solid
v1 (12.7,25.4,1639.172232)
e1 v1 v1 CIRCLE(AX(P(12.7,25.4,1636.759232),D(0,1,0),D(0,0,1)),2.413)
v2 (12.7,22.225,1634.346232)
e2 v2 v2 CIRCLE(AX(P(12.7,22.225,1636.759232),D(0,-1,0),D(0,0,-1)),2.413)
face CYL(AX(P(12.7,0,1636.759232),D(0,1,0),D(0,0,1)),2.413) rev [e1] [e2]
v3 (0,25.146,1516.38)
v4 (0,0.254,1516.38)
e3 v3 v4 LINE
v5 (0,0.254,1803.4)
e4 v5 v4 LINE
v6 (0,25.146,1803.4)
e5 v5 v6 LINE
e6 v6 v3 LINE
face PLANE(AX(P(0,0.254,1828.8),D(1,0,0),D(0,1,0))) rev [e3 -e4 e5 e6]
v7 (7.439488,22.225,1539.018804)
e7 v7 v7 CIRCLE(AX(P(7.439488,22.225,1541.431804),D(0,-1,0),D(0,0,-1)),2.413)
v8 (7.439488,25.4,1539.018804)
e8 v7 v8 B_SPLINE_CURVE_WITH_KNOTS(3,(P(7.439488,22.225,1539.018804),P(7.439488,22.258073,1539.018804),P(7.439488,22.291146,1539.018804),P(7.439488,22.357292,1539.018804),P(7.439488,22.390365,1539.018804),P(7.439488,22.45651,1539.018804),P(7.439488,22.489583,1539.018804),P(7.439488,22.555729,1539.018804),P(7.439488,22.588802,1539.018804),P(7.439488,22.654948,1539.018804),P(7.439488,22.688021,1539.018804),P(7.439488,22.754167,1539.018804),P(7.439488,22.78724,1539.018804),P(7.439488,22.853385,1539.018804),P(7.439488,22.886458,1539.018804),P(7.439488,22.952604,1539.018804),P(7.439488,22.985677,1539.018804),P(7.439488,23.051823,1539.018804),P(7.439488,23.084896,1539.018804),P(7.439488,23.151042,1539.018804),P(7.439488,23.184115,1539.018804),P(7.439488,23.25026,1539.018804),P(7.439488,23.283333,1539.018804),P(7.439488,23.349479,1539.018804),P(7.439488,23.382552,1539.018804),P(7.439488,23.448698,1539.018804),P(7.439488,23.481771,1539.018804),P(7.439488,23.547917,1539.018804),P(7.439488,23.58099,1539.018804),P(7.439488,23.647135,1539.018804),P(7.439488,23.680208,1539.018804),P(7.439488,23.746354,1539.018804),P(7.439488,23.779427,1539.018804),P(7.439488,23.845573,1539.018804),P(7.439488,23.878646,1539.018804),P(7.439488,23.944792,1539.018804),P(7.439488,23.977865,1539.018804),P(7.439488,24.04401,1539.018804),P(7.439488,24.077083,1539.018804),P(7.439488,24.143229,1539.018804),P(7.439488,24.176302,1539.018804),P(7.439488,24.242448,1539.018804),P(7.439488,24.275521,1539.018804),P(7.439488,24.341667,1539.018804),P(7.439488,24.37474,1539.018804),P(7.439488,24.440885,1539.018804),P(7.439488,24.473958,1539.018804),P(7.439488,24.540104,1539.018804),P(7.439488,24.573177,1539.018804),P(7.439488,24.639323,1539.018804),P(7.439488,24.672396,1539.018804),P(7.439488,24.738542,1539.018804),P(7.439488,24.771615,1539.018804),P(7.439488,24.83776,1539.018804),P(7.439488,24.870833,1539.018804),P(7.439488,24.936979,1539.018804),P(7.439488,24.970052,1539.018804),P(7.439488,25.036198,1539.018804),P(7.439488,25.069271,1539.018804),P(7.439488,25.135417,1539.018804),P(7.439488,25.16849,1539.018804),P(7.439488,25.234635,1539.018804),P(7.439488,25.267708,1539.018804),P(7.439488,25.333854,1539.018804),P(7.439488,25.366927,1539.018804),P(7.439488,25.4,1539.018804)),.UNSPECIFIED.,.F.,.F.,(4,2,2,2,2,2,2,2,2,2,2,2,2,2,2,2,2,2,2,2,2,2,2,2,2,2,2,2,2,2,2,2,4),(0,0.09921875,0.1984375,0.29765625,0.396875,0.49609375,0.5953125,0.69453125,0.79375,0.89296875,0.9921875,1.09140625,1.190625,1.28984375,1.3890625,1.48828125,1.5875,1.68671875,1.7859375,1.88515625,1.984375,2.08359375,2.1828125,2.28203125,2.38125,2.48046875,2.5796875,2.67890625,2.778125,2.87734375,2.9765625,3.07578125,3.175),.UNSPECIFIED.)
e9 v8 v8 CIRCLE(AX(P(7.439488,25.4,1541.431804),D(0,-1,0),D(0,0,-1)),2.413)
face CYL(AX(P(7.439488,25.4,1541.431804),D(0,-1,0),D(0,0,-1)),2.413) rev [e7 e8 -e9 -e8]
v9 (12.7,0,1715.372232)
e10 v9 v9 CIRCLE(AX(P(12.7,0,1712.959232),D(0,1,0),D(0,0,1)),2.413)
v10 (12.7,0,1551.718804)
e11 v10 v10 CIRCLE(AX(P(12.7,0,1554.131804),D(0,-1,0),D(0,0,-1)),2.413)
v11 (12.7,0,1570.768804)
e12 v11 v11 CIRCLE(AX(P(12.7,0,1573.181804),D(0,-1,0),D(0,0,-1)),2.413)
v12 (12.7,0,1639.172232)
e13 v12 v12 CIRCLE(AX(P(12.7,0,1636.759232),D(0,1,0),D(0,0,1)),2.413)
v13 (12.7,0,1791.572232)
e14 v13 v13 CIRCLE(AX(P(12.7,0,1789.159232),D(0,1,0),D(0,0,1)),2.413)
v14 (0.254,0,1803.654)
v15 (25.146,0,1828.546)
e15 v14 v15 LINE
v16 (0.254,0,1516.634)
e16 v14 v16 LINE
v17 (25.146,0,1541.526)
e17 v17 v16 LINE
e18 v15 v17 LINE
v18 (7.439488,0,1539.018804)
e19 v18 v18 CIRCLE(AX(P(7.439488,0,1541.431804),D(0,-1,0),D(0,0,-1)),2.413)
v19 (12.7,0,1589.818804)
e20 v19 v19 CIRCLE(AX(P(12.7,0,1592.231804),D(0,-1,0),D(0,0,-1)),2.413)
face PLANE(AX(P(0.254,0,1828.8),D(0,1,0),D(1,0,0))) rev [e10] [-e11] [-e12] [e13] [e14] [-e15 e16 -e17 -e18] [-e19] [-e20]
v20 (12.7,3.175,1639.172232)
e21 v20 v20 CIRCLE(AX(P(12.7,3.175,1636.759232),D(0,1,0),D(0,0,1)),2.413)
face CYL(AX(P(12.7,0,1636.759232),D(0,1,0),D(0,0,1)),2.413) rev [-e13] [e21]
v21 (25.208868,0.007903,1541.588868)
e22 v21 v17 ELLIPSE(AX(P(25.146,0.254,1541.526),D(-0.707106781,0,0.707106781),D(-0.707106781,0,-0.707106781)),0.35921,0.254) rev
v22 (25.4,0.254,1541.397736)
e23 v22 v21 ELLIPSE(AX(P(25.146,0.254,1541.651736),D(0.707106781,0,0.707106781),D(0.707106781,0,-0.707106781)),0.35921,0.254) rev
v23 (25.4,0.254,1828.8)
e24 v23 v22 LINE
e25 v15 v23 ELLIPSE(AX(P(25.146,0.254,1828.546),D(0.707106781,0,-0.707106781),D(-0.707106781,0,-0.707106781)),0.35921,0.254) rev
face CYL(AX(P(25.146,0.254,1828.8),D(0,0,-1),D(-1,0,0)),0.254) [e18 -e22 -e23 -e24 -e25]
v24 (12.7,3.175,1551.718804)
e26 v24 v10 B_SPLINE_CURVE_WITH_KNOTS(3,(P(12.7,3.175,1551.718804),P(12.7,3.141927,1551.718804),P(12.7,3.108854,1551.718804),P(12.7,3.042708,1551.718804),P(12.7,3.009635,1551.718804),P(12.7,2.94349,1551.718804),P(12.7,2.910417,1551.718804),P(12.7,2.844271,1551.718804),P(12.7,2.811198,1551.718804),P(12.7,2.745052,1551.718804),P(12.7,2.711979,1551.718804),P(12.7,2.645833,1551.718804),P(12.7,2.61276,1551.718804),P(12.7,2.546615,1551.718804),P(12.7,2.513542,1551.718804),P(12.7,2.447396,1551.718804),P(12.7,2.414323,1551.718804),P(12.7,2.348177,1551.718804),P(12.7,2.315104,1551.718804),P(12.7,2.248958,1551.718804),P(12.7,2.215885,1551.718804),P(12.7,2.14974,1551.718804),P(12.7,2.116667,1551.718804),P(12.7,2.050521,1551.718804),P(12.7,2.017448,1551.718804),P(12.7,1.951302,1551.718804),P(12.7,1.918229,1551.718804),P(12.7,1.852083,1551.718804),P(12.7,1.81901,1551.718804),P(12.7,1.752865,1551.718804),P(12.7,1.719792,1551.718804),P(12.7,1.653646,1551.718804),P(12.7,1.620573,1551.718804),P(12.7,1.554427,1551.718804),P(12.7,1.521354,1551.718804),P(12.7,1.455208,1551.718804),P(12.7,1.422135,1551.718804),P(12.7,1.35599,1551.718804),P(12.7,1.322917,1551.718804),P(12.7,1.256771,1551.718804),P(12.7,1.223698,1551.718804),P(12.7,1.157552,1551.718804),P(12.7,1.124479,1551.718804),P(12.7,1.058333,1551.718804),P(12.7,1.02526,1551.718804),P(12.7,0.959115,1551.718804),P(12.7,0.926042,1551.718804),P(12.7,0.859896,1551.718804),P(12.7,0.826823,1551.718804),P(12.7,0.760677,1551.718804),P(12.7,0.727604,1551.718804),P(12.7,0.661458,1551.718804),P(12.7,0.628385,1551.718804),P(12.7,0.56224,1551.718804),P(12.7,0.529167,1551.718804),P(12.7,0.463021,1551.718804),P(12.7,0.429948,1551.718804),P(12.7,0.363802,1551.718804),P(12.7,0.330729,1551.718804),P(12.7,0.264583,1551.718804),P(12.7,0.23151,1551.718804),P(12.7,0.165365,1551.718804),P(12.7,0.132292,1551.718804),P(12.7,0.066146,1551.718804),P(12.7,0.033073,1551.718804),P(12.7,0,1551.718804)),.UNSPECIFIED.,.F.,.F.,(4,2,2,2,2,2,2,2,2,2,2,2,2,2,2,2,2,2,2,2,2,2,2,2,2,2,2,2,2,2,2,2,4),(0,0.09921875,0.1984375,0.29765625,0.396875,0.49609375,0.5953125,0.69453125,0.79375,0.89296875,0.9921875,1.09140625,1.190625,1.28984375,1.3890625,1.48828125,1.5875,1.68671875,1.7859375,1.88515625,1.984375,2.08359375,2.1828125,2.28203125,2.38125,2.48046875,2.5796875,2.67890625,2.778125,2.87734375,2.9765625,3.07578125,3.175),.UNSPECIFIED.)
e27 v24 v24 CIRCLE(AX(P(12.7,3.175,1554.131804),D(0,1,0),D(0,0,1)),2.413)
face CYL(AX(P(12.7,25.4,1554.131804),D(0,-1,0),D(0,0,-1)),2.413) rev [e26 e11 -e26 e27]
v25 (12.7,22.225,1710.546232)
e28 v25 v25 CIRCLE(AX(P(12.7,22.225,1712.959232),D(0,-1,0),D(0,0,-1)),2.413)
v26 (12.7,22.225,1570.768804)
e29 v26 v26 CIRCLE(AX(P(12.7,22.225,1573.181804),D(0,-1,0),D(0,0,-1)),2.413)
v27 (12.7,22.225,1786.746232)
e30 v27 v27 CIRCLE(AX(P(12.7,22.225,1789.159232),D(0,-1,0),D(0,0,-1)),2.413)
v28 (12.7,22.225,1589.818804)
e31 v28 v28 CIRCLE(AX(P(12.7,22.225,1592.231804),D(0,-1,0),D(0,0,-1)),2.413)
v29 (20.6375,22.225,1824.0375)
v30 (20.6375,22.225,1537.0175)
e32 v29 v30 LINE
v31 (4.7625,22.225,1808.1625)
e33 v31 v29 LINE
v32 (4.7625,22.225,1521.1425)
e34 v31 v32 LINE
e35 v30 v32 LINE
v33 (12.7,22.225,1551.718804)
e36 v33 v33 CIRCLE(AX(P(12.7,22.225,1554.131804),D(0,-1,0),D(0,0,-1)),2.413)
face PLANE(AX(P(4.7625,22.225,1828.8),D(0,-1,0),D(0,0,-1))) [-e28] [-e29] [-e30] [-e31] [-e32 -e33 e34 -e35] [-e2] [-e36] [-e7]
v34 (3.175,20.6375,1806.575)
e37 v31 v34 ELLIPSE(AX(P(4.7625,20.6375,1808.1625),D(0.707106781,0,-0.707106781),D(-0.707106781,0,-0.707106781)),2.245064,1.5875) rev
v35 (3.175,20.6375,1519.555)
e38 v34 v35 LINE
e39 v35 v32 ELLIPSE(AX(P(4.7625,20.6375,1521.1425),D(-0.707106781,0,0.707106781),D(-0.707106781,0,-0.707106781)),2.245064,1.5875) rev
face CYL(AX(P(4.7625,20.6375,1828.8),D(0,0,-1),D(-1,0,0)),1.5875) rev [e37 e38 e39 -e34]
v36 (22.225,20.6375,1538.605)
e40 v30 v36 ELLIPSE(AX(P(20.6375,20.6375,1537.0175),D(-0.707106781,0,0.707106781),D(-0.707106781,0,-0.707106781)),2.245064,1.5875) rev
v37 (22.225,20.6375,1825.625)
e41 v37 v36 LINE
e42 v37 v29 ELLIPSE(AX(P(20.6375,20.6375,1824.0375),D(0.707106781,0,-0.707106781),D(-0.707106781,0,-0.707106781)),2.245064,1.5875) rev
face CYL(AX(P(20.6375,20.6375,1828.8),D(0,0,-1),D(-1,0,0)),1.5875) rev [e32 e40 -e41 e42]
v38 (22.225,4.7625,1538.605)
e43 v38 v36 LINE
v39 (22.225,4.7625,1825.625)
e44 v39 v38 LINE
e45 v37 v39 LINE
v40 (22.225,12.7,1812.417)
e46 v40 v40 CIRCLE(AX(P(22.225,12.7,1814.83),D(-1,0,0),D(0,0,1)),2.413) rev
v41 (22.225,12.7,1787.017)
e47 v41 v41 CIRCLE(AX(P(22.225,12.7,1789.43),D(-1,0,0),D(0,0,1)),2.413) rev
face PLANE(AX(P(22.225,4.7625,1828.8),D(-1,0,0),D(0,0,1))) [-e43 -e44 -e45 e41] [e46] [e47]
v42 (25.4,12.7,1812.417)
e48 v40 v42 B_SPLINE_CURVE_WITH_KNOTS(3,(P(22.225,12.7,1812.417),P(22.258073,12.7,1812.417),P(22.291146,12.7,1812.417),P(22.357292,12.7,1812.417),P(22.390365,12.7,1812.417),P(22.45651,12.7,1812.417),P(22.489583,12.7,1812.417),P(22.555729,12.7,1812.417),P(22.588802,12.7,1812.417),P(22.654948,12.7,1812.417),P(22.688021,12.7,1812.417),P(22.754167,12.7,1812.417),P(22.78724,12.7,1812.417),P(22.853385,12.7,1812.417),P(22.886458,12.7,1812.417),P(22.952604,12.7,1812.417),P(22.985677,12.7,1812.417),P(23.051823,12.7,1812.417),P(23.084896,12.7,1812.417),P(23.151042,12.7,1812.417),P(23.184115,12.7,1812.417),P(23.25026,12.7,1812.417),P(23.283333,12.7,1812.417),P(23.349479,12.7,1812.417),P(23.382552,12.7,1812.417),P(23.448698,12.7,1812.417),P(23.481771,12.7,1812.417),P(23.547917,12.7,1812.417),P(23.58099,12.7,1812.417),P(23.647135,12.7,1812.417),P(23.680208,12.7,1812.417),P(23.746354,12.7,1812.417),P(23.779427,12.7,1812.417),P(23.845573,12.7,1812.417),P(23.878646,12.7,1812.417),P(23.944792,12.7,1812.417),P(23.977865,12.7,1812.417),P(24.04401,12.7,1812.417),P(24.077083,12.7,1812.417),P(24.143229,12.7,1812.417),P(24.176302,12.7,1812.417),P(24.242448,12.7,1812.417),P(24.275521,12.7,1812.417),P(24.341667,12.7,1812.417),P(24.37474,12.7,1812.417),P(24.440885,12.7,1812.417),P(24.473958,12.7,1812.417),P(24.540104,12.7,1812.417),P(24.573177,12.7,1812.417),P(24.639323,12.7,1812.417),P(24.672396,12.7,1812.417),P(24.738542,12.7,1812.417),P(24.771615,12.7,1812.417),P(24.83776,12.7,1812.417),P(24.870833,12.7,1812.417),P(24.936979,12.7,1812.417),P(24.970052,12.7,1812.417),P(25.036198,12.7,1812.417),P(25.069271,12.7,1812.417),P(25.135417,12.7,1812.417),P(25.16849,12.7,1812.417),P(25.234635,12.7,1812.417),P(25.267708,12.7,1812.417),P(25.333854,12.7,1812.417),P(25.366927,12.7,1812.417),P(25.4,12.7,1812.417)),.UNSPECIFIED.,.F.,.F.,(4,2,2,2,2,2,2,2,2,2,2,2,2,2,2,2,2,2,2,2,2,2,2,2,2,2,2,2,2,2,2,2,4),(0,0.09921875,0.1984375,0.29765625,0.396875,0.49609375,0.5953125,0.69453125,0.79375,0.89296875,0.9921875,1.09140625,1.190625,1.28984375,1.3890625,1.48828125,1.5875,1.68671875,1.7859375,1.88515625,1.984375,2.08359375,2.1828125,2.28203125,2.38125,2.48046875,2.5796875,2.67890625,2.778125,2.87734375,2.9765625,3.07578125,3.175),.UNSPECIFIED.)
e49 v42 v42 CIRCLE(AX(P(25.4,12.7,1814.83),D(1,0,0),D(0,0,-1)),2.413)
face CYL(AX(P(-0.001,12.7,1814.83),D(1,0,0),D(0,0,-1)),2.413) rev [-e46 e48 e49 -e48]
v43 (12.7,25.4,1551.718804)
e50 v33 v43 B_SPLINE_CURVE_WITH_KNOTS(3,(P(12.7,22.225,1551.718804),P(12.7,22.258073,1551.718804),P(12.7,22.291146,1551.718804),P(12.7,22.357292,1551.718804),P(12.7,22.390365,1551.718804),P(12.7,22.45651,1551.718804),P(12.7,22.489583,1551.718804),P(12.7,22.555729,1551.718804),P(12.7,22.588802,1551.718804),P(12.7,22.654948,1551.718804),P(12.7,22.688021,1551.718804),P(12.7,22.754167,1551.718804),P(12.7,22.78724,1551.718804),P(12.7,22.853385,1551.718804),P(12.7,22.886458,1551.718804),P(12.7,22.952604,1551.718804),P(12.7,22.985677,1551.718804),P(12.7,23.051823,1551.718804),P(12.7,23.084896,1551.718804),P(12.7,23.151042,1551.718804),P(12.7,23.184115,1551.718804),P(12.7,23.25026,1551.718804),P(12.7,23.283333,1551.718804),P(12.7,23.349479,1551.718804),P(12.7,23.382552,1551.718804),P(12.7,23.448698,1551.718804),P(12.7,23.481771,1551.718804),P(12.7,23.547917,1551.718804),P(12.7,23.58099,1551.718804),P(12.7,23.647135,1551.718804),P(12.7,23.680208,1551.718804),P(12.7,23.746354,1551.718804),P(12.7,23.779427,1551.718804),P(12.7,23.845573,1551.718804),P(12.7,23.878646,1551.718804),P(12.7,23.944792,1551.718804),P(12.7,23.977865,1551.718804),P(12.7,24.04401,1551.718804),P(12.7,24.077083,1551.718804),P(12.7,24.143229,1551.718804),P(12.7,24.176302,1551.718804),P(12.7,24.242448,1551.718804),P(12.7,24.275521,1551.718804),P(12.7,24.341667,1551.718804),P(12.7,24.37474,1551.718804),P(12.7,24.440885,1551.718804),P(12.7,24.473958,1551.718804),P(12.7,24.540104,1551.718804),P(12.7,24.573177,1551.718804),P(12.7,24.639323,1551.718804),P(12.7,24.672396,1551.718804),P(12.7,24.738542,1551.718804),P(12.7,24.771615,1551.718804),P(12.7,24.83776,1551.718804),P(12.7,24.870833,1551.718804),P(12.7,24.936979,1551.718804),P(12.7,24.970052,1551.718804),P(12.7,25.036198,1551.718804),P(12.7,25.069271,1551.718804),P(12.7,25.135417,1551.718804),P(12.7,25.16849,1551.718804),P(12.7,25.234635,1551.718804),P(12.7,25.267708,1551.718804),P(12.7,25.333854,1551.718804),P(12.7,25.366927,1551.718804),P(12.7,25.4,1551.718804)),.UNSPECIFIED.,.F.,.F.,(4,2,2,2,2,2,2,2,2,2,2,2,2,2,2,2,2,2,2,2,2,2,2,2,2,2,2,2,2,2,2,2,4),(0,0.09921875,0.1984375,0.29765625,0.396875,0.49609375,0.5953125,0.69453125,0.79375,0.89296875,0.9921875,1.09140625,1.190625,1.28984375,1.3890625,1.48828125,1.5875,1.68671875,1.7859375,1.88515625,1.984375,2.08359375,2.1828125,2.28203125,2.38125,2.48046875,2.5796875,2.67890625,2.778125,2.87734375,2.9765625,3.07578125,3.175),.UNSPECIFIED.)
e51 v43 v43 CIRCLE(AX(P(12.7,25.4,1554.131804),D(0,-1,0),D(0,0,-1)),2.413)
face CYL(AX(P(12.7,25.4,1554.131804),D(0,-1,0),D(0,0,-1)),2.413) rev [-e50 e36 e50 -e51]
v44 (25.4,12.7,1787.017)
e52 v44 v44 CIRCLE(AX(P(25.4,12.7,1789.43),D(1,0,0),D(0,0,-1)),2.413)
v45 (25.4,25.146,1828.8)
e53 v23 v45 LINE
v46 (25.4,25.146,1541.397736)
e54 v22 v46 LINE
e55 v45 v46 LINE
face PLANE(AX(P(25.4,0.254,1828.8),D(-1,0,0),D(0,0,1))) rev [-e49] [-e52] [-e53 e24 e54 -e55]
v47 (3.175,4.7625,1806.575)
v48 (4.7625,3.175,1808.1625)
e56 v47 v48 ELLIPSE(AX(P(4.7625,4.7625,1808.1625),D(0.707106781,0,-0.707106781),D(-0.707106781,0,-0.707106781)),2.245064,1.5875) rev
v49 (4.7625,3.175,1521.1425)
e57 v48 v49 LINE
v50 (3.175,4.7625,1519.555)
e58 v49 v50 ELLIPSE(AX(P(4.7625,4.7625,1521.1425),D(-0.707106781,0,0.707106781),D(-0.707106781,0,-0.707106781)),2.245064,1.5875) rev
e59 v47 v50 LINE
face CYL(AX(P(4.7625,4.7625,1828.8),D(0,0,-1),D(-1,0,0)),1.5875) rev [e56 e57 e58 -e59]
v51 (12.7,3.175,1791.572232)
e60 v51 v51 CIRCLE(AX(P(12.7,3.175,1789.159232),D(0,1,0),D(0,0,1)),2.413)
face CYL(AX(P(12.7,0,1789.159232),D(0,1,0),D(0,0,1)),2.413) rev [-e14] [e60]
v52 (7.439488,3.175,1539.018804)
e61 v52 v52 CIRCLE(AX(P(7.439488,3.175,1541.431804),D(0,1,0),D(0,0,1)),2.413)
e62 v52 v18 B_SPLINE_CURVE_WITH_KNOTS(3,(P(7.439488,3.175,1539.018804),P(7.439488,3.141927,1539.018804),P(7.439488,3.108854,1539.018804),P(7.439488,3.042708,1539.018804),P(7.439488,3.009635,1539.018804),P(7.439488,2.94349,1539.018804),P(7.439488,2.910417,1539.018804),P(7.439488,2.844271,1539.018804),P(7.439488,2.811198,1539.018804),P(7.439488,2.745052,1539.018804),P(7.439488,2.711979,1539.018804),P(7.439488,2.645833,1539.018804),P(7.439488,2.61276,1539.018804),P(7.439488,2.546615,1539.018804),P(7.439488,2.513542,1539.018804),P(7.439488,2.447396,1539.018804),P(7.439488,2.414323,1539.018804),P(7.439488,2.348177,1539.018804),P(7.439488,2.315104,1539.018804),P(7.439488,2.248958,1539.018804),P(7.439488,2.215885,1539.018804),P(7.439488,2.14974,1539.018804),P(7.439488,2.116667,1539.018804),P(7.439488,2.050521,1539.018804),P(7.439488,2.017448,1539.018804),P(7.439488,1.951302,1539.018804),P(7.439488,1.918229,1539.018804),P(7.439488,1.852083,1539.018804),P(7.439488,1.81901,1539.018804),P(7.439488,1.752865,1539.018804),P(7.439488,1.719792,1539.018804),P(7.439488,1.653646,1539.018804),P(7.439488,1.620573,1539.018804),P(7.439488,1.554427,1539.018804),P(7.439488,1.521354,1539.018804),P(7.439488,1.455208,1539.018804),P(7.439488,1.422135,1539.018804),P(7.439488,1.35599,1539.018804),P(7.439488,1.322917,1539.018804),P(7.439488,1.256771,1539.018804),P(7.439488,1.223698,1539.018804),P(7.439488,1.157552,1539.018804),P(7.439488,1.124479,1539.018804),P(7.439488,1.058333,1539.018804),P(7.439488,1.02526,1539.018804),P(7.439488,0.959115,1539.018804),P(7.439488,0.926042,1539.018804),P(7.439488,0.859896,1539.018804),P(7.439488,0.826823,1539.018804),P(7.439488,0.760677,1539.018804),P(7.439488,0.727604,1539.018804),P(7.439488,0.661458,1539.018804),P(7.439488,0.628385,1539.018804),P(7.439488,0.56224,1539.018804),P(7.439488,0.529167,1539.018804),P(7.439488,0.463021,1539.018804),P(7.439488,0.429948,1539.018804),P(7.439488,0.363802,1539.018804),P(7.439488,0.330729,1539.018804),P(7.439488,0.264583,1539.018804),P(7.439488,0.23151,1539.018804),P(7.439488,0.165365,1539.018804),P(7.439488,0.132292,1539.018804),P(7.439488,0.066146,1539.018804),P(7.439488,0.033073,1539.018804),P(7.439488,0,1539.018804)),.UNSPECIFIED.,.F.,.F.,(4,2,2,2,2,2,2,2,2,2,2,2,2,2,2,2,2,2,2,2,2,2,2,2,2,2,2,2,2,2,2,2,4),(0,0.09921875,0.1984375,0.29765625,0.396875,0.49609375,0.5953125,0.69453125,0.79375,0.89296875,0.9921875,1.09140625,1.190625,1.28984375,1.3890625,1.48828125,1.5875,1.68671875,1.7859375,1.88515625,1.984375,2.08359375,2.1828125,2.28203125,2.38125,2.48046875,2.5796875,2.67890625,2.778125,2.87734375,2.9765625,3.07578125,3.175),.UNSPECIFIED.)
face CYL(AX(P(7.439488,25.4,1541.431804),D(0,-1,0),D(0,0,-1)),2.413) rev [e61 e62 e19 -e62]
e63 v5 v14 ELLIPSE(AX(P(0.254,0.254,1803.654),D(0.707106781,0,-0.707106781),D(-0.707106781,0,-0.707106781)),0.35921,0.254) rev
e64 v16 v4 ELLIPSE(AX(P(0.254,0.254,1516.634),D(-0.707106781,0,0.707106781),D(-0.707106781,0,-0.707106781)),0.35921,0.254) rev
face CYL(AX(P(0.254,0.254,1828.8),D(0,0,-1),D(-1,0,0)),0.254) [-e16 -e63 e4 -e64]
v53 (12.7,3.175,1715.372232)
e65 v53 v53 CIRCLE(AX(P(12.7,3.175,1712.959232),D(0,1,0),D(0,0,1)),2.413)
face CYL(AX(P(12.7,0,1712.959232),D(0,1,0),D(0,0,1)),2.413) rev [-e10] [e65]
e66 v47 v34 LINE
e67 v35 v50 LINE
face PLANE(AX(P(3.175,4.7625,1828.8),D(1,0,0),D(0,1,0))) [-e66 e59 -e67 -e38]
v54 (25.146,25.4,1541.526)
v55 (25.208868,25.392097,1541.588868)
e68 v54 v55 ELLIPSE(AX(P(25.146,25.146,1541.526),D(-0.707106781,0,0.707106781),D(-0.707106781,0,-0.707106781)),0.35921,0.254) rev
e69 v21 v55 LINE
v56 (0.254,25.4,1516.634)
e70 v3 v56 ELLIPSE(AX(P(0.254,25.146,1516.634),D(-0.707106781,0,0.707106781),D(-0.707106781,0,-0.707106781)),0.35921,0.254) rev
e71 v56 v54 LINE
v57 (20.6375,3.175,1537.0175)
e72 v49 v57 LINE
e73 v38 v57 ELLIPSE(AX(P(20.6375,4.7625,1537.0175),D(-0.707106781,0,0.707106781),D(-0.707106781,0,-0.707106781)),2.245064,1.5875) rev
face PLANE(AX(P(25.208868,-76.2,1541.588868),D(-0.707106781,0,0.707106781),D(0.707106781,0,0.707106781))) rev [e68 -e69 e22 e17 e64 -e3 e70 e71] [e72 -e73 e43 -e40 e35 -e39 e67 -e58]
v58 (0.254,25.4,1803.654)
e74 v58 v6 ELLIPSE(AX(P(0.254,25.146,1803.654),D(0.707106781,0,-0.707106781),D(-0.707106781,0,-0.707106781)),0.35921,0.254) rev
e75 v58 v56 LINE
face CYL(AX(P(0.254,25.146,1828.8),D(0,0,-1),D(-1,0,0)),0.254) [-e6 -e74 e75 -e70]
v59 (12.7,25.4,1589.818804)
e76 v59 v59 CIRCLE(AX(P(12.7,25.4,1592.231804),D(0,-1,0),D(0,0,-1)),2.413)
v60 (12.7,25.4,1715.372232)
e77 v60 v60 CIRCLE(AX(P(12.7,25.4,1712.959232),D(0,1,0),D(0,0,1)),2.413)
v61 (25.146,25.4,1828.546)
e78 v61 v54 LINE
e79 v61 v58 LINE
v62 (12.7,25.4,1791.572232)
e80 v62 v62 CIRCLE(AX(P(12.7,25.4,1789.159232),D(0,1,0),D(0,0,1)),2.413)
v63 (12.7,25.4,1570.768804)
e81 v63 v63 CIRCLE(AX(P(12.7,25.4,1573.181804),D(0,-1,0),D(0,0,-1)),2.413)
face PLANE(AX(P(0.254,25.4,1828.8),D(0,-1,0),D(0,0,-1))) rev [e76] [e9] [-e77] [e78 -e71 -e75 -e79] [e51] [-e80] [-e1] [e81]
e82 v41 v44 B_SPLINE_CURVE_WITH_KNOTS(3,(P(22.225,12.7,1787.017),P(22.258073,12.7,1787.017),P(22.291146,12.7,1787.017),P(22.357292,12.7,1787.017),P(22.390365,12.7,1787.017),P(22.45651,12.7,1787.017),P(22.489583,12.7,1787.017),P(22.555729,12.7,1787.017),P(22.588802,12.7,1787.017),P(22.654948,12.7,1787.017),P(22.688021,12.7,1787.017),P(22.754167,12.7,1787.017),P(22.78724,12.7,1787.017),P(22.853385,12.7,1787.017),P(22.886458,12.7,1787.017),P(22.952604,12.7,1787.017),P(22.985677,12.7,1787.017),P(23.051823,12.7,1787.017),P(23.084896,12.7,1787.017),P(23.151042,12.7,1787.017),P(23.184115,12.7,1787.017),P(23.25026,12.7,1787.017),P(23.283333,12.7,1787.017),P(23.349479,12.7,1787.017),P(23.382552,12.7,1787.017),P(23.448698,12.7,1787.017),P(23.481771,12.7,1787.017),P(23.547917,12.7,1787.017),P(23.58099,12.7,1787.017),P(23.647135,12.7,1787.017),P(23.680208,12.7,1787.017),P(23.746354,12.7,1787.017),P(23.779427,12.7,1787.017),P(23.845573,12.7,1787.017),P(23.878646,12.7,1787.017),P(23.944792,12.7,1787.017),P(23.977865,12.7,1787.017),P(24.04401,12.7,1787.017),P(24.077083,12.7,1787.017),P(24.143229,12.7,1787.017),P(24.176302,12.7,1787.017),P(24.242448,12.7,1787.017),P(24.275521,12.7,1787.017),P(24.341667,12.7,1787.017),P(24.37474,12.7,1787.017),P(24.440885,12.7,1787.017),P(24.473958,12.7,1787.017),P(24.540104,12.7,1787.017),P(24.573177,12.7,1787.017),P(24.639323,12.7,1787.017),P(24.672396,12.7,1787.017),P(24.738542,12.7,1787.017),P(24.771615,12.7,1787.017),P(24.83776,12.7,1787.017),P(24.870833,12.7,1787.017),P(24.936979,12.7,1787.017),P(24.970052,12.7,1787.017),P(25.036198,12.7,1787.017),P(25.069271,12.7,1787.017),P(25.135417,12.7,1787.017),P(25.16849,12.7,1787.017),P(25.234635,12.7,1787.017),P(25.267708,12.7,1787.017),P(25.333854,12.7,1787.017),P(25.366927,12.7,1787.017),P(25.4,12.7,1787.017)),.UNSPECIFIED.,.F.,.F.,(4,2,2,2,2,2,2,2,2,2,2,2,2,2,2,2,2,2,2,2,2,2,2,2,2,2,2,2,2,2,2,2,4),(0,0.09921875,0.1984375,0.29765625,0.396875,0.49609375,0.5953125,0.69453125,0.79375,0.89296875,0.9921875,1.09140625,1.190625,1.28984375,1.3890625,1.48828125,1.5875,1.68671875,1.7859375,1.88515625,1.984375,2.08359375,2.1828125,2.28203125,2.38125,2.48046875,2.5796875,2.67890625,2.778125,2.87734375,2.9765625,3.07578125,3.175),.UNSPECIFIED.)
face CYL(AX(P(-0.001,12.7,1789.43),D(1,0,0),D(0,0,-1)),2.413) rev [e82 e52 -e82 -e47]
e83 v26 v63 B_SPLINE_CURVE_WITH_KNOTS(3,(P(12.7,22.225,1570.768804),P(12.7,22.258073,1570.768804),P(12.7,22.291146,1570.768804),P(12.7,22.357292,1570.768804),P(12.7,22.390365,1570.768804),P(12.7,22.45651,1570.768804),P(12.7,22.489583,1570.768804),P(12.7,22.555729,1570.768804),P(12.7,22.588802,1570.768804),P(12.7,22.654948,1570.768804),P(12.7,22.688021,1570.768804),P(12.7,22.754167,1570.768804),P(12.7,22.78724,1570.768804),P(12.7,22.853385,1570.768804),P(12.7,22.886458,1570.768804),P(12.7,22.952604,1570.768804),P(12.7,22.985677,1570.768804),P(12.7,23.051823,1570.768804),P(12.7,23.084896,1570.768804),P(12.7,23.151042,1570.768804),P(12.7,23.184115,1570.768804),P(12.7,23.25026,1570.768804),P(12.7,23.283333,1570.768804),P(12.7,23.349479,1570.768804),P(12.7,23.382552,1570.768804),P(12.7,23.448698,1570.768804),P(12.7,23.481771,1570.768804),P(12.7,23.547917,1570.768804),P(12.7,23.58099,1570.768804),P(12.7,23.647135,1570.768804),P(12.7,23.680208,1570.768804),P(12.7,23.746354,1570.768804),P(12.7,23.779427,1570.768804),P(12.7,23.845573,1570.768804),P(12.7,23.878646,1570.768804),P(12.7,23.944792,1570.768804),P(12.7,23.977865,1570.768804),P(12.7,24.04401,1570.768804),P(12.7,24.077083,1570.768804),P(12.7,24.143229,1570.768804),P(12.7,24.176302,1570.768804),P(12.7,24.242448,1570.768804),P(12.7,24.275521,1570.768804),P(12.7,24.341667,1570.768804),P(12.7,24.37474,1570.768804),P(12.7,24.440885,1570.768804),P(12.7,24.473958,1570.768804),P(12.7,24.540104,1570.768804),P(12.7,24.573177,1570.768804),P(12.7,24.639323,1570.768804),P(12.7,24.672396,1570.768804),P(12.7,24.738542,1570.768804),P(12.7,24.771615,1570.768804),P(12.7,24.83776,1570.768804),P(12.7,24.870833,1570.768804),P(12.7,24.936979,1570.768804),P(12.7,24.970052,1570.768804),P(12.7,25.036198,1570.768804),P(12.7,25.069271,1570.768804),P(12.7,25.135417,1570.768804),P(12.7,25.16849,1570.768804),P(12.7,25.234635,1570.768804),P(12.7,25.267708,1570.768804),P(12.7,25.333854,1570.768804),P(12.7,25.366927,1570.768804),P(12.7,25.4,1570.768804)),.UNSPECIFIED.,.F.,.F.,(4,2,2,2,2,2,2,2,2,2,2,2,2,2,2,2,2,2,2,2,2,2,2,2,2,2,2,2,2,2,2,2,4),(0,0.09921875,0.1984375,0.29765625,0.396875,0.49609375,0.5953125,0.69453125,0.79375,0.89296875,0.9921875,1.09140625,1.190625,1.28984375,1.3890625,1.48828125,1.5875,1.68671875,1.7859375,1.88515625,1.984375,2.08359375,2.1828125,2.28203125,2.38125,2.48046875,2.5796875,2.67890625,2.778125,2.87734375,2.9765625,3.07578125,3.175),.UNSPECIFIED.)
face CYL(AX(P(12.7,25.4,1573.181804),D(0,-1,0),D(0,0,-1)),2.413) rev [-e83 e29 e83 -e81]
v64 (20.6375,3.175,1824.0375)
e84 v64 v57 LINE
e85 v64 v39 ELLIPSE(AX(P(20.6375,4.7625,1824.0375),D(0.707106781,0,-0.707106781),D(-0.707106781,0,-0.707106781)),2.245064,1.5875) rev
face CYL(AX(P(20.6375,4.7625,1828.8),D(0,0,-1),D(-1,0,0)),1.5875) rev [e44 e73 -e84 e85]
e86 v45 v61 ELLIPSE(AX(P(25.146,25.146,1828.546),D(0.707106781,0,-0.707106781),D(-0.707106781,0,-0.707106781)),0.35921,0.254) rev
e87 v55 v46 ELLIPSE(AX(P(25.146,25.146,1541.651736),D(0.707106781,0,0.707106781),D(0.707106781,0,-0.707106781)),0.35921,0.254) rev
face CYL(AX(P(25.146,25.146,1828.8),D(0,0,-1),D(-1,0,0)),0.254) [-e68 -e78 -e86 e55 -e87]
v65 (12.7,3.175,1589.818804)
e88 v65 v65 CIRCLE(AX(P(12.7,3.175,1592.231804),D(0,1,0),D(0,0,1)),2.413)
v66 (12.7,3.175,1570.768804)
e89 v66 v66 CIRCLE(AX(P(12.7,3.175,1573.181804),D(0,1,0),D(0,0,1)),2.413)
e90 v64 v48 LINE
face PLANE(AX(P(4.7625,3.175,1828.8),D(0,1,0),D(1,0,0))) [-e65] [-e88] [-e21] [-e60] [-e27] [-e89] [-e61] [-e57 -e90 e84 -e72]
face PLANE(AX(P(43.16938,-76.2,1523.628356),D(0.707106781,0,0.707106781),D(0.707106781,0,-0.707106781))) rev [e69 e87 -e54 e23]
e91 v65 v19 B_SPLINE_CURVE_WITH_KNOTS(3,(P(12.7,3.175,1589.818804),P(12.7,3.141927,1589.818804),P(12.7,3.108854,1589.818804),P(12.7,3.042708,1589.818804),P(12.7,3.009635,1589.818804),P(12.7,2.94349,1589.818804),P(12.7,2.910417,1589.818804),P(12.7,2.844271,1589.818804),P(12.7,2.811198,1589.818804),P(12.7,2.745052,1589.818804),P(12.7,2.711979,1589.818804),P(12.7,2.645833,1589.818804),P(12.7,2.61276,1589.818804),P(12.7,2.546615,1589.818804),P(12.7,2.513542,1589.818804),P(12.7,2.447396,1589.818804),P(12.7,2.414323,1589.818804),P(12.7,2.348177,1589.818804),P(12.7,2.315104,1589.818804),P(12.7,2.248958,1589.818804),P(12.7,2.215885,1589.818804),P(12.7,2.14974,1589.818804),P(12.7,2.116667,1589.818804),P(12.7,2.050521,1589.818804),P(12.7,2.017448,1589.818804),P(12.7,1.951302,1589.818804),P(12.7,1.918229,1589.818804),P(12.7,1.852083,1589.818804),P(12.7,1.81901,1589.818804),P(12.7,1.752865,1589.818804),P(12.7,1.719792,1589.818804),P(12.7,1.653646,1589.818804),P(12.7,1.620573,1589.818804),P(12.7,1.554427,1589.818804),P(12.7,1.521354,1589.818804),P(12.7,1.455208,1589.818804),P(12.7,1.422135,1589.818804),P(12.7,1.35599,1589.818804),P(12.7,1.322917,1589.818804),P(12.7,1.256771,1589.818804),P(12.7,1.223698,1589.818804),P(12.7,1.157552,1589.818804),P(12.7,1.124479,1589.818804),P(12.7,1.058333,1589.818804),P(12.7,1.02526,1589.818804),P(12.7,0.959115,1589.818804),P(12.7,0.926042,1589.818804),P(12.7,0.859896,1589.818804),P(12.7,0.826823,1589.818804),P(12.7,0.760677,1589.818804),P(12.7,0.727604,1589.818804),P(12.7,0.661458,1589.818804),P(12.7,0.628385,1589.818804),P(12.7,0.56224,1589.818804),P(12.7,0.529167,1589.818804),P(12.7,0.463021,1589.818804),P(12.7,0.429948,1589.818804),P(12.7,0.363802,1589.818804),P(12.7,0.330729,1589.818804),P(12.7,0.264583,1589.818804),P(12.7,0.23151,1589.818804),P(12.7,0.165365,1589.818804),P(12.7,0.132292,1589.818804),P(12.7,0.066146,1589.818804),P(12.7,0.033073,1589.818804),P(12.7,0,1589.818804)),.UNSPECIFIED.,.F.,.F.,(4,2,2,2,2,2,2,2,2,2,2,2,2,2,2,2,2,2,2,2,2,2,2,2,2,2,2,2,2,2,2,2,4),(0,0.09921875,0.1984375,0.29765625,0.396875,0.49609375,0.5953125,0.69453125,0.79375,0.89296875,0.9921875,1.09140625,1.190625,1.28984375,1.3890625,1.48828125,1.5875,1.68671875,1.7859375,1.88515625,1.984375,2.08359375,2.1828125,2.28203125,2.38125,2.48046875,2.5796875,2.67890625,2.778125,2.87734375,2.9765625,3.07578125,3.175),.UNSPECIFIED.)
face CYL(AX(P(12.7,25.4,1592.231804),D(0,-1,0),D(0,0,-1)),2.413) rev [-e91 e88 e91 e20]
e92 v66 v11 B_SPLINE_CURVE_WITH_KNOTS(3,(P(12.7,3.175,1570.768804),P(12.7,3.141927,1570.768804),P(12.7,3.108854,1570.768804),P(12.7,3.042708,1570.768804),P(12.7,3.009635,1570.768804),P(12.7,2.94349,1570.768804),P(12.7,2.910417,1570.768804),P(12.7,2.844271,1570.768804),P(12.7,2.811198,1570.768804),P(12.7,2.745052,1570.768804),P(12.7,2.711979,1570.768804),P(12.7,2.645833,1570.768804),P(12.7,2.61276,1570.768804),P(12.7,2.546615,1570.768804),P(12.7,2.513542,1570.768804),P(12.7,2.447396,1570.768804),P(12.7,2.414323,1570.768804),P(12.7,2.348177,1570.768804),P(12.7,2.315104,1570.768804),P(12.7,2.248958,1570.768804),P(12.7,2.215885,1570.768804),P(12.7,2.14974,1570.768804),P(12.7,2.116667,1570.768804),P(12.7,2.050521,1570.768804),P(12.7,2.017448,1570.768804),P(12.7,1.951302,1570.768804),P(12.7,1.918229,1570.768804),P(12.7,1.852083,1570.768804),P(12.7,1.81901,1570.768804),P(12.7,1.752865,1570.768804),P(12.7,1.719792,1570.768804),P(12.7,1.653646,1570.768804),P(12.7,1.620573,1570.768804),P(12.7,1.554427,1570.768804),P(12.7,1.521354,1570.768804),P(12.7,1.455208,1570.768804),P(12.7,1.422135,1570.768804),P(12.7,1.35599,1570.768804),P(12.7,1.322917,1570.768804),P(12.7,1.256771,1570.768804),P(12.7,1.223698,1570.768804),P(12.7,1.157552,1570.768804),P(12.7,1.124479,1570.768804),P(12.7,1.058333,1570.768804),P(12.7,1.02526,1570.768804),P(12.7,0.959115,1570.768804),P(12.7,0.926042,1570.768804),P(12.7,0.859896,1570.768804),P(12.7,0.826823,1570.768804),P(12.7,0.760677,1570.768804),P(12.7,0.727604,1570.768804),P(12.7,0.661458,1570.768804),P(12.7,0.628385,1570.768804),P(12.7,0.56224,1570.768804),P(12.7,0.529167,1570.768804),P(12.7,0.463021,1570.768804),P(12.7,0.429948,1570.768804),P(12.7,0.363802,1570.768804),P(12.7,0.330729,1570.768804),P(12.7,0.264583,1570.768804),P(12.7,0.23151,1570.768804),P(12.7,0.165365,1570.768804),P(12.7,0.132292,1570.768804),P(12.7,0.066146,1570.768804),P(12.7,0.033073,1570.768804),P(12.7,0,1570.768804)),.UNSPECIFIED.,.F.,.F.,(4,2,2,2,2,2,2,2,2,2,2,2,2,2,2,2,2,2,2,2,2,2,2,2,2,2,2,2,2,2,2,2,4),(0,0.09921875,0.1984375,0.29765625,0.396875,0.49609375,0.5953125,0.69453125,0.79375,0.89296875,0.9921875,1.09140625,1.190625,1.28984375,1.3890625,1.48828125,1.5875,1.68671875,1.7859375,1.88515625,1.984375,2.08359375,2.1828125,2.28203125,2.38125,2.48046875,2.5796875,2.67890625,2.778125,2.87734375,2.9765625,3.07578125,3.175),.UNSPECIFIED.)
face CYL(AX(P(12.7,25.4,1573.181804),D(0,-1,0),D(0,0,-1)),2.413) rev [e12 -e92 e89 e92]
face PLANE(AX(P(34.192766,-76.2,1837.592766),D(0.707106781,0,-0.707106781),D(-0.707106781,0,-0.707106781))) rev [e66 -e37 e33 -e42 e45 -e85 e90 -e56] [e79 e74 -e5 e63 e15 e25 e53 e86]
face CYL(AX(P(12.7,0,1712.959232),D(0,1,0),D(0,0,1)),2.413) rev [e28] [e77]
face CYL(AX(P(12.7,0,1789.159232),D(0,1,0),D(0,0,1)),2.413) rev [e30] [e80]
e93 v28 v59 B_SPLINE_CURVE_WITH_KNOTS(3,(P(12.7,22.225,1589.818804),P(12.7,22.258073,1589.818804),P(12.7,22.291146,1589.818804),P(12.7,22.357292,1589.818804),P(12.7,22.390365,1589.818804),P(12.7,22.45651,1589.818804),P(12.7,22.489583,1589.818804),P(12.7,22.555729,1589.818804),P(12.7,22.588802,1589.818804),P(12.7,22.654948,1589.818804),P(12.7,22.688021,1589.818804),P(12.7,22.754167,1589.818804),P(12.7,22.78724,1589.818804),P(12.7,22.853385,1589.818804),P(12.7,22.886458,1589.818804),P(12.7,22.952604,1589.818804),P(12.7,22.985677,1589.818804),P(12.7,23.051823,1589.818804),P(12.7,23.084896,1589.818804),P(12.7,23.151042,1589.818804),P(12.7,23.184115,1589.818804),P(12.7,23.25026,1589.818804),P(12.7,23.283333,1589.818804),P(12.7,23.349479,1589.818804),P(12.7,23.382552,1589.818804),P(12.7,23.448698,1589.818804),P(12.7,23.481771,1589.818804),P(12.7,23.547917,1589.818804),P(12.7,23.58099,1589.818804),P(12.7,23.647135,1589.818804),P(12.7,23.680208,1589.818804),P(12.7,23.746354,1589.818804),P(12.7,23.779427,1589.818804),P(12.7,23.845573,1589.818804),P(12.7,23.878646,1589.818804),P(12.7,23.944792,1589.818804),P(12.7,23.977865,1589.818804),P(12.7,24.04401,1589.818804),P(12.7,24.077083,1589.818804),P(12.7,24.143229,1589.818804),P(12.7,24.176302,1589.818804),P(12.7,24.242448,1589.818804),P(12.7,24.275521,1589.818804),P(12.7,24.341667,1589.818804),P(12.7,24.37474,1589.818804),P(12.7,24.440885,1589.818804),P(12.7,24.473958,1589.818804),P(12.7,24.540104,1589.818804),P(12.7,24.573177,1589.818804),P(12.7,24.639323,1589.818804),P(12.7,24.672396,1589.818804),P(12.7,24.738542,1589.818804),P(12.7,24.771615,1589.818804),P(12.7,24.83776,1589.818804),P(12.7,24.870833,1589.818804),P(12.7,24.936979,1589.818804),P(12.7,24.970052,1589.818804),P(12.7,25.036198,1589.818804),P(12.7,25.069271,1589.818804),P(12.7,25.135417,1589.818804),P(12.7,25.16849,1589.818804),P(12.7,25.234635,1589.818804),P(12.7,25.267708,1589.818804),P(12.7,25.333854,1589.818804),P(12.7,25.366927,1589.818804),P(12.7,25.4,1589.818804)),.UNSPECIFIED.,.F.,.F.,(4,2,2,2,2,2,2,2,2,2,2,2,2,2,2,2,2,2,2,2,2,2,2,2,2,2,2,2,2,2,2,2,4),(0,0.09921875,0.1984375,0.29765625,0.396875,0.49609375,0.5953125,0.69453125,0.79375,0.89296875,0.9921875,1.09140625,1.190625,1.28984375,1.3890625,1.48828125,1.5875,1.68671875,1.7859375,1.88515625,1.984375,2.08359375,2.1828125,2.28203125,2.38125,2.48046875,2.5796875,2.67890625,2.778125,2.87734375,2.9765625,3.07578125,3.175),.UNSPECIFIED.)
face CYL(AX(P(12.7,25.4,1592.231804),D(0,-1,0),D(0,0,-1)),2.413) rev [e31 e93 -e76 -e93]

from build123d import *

# Parameters (mm, degrees)
CUT_EXTRUDE1_START = 1516.38
CUT_EXTRUDE1_DEPTH = 312.42
CUT_EXTRUDE2_REACH = 1831.153
CUT_EXTRUDE3_REACH = 1831.153
SKETCH4_R          = 2.413
CUT_EXTRUDE4_DEPTH = 1830.152743759
SKETCH5_R          = 2.413
CUT_EXTRUDE5_DEPTH = 1830.152743759
CUT_EXTRUDE7_REACH = 1831.153
SKETCH8_R          = 2.413


with BuildPart() as part:
    # Cut-Extrude1: read off the stored shape, not the designer's step
    # Cut-Extrude1 outline → Cut-Extrude1 (new body)
    with BuildSketch(Plane.XY.offset(CUT_EXTRUDE1_START)):
        with BuildLine():
            Line((0, 25.146), (0, 0.254))
            ThreePointArc((0, 0.254), (0.074394878, 0.074394878), (0.254, 0))
            Line((0.254, 0), (25.146, 0))
            ThreePointArc((25.146, 0), (25.325605122, 0.074394878), (25.4, 0.254))
            Line((25.4, 0.254), (25.4, 25.146))
            ThreePointArc((25.4, 25.146), (25.325605122, 25.325605122), (25.146, 25.4))
            Line((25.146, 25.4), (0.254, 25.4))
            ThreePointArc((0.254, 25.4), (0.074394878, 25.325605122), (0, 25.146))
        make_face()
        with BuildLine():
            ThreePointArc((4.7625, 3.175), (3.639967985, 3.639967985), (3.175, 4.7625))
            Line((3.175, 4.7625), (3.175, 20.6375))
            ThreePointArc((3.175, 20.6375), (3.639967985, 21.760032015), (4.7625, 22.225))
            Line((4.7625, 22.225), (20.6375, 22.225))
            ThreePointArc((20.6375, 22.225), (21.760032015, 21.760032015), (22.225, 20.6375))
            Line((22.225, 20.6375), (22.225, 4.7625))
            ThreePointArc((22.225, 4.7625), (21.760032015, 3.639967985), (20.6375, 3.175))
            Line((20.6375, 3.175), (4.7625, 3.175))
        make_face(mode=Mode.SUBTRACT)
    extrude(amount=CUT_EXTRUDE1_DEPTH)

    # Cut-Extrude2: up to this face of the body (flat: up to its plane)
    cut_extrude2_end = Plane(part.part.faces().sort_by_distance((12.7, 0, 1672.59))[0])
    # Sketch2 → Cut-Extrude2 (cut, up to the picked face)
    with BuildSketch(Plane(origin=(0, 25.4, 0), x_dir=(1, 0, 0), z_dir=(0, 1, 0)), mode=Mode.PRIVATE) as cut_extrude2_sk1:
        Polygon((43.169380192, -1523.628355708), (25.20886795, -1541.58886795), (-10.712156534, -1505.667843466), (7.248355708, -1487.707331224), align=None)
    cut_extrude2_tool1 = split(extrude(cut_extrude2_sk1.sketch, amount=-CUT_EXTRUDE2_REACH, mode=Mode.PRIVATE), bisect_by=cut_extrude2_end, keep=Keep.BOTH, mode=Mode.PRIVATE)
    add(cut_extrude2_tool1.solids().sort_by(Axis((16.228612, 25.4, 1514.6481), (0, -1, 0)))[0], mode=Mode.SUBTRACT)

    # Cut-Extrude3: up to this face of the body (flat: up to its plane)
    cut_extrude3_end = Plane(part.part.faces().sort_by_distance((12.527724859, 0, 1678.853862429))[0])
    # Sketch3 → Cut-Extrude3 (cut, up to the picked face)
    with BuildSketch(Plane(origin=(0, 25.4, 0), x_dir=(1, 0, 0), z_dir=(0, 1, 0)), mode=Mode.PRIVATE) as cut_extrude3_sk1:
        Polygon((34.192766306, -1837.592766306), (16.232254064, -1855.553278548), (-19.688770421, -1819.632254064), (-1.728258178, -1801.671741822), align=None)
    cut_extrude3_tool1 = split(extrude(cut_extrude3_sk1.sketch, amount=-CUT_EXTRUDE3_REACH, mode=Mode.PRIVATE), bisect_by=cut_extrude3_end, keep=Keep.BOTH, mode=Mode.PRIVATE)
    add(cut_extrude3_tool1.solids().sort_by(Axis((7.251998, 25.4, 1828.61251), (0, -1, 0)))[0], mode=Mode.SUBTRACT)

    # Sketch4 → Cut-Extrude4 (cut, through all)
    with BuildSketch(Plane(origin=(0, 25.4, 0), x_dir=(1, 0, 0), z_dir=(0, 1, 0))):
        with Locations(Location((12.7, -1789.159231637, 0), (0, 0, 270))):
            Circle(SKETCH4_R)
        with Locations(Location((12.7, -1712.959231637, 0), (0, 0, 270))):
            Circle(SKETCH4_R)
        with Locations(Location((12.7, -1636.759231637, 0), (0, 0, 270))):
            Circle(SKETCH4_R)
    extrude(amount=-CUT_EXTRUDE4_DEPTH, mode=Mode.SUBTRACT)

    # Sketch5 → Cut-Extrude5 (cut, through all)
    with BuildSketch(Plane.XZ):
        with Locations(Location((7.439487758, 1541.431804126, 0), (0, 0, 270))):
            Circle(SKETCH5_R)
        with Locations(Location((12.7, 1554.131804126, 0), (0, 0, 270))):
            Circle(SKETCH5_R)
        with Locations(Location((12.7, 1573.181804126, 0), (0, 0, 270))):
            Circle(SKETCH5_R)
        with Locations(Location((12.7, 1592.231804126, 0), (0, 0, 270))):
            Circle(SKETCH5_R)
    extrude(amount=-CUT_EXTRUDE5_DEPTH, mode=Mode.SUBTRACT)

    # Sketch8 → Cut-Extrude7 (cut, up to next)
    with BuildSketch(Plane(origin=(25.4, 0, 0), x_dir=(0, 0, -1), z_dir=(1, 0, 0)), mode=Mode.PRIVATE) as cut_extrude7_sk1:
        with Locations((-1814.83, 12.7)):
            Circle(SKETCH8_R)
    cut_extrude7_tool1 = extrude(cut_extrude7_sk1.sketch, amount=-CUT_EXTRUDE7_REACH, mode=Mode.PRIVATE) & part.part
    # Sketch8 → Cut-Extrude7 (cut, up to next)
    with BuildSketch(Plane(origin=(25.4, 0, 0), x_dir=(0, 0, -1), z_dir=(1, 0, 0)), mode=Mode.PRIVATE) as cut_extrude7_sk2:
        with Locations((-1789.43, 12.7)):
            Circle(SKETCH8_R)
    cut_extrude7_tool2 = extrude(cut_extrude7_sk2.sketch, amount=-CUT_EXTRUDE7_REACH, mode=Mode.PRIVATE) & part.part
    add(cut_extrude7_tool1.solids().sort_by_distance((25.4, 12.7, 1814.83))[0], mode=Mode.SUBTRACT)
    add(cut_extrude7_tool2.solids().sort_by_distance((25.4, 12.7, 1789.43))[0], mode=Mode.SUBTRACT)


solid = part.part
